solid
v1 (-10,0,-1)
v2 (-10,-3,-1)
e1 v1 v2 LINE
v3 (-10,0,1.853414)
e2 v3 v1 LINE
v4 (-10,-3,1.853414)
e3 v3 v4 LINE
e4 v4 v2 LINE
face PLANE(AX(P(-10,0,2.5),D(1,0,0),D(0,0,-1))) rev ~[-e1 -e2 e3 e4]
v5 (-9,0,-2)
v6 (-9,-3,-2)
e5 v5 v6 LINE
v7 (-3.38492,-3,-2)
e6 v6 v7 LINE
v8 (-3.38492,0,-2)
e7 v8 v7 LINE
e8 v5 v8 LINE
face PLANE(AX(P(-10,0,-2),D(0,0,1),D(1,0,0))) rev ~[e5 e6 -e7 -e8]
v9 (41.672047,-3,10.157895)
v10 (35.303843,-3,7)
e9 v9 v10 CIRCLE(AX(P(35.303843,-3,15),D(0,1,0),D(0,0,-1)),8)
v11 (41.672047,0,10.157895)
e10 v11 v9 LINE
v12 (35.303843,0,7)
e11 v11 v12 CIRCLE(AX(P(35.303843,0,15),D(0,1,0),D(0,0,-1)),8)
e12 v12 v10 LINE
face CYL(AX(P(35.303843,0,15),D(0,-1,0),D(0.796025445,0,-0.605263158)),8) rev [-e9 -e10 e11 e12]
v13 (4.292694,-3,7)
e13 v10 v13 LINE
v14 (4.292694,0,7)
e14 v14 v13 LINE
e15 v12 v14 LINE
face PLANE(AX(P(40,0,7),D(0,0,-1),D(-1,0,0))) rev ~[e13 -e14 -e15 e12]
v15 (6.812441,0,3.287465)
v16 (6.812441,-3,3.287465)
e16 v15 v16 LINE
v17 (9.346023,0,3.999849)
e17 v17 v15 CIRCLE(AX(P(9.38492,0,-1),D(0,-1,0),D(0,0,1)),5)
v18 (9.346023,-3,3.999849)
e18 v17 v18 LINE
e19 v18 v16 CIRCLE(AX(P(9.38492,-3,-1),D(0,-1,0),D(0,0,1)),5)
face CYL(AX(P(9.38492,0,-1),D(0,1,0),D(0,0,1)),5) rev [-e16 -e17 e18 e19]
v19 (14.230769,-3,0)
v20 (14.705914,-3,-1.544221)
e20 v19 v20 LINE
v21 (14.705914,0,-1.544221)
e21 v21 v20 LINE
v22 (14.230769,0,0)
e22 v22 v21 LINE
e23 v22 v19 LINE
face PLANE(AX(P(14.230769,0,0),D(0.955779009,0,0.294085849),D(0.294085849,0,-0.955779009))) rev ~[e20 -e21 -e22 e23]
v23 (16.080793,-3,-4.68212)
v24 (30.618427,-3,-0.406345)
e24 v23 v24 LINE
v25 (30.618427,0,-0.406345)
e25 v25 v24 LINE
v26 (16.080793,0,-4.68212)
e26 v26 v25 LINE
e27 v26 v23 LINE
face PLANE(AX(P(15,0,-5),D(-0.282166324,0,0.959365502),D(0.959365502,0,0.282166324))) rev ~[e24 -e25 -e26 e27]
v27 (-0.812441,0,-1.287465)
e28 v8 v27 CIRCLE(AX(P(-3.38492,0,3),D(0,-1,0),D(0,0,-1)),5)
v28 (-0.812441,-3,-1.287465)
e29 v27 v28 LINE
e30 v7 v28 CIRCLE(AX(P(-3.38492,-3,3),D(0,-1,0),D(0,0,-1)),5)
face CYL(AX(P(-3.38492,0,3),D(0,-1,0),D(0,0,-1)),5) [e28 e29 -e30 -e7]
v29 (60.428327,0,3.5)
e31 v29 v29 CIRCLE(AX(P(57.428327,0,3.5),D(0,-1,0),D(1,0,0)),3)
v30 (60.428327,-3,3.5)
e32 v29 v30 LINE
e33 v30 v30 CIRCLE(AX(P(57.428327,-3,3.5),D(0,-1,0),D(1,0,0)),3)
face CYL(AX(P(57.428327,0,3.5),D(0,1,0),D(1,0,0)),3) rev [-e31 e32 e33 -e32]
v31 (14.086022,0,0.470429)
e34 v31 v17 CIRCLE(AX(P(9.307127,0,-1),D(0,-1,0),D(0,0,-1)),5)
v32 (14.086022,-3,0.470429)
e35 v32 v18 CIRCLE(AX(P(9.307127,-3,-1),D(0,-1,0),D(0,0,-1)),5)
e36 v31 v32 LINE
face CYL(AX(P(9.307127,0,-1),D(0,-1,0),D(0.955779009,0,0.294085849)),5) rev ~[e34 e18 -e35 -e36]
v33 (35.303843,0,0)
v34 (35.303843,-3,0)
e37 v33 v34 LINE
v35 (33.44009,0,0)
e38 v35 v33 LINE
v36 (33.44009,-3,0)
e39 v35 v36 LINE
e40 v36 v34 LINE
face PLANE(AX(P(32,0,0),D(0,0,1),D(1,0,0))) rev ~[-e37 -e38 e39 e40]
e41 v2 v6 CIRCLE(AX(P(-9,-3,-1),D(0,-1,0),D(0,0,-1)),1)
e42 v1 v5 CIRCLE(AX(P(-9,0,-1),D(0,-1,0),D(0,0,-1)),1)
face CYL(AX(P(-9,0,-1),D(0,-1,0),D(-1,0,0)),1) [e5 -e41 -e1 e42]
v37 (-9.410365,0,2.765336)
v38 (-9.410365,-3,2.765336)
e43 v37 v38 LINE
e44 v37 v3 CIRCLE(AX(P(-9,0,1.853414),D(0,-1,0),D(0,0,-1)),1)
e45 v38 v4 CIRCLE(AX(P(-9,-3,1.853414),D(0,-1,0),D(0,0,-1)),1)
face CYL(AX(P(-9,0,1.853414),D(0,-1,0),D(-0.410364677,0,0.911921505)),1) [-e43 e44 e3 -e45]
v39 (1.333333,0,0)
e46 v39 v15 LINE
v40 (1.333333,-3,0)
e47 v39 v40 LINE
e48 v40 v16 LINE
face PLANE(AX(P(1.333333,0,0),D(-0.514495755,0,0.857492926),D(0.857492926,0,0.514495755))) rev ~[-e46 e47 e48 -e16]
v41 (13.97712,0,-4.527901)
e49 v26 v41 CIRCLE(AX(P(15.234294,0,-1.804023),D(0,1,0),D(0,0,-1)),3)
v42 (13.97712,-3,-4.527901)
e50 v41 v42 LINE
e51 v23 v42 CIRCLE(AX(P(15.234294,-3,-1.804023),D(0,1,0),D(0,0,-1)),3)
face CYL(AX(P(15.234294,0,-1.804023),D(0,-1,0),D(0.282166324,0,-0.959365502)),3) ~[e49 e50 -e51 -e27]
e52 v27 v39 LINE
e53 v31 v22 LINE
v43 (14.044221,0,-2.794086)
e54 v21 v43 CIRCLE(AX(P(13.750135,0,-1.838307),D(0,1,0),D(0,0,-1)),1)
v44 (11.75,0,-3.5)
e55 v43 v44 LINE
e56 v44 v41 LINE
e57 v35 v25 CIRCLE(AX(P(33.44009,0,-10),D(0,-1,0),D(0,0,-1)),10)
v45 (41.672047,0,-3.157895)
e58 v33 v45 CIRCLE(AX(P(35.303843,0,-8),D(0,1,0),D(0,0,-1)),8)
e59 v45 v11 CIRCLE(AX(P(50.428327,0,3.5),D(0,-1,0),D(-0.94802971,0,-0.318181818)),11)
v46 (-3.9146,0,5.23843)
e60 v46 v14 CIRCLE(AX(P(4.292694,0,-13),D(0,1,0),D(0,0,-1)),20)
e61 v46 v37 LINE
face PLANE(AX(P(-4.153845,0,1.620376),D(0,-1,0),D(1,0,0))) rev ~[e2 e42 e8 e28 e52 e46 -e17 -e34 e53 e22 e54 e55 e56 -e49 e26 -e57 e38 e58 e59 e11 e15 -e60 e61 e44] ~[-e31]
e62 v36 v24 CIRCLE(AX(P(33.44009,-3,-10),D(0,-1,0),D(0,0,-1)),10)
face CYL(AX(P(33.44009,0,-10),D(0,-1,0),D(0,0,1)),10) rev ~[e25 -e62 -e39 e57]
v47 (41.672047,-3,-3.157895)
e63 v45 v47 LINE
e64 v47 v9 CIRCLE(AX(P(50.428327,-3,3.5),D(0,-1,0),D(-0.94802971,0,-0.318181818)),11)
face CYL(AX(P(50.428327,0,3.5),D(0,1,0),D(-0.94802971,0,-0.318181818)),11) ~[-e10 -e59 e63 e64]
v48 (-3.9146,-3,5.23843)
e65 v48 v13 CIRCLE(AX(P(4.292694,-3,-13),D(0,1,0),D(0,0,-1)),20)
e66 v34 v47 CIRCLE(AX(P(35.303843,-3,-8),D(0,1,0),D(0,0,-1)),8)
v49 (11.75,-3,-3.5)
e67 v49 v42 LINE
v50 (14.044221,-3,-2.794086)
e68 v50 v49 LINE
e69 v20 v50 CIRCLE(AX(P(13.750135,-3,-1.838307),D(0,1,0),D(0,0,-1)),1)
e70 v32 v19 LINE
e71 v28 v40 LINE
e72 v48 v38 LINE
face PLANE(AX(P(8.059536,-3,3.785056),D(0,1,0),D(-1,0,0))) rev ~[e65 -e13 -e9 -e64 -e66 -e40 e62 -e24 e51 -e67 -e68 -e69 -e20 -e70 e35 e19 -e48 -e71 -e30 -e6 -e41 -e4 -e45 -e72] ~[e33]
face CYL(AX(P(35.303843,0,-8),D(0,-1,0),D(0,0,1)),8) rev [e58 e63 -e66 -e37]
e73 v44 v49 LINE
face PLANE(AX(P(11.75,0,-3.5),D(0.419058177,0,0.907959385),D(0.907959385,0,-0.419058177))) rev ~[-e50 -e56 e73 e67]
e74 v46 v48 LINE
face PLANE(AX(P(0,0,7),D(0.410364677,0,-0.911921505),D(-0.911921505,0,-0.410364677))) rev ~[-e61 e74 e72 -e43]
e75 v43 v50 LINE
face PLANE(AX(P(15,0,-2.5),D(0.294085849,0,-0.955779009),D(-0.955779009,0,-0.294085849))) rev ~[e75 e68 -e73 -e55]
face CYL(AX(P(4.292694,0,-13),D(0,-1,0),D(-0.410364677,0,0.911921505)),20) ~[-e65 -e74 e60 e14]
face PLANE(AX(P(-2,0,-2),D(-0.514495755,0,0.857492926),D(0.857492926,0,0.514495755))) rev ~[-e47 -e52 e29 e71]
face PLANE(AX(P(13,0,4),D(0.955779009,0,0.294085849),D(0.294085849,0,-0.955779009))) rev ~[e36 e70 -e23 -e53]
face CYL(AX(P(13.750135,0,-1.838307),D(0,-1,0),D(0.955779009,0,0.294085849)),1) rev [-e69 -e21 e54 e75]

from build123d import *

# Parameters (mm, degrees)
F0_R        = 3
F1_DEPTH    = 3
F2_R        = 10
F3_R        = 5
F4_R        = 1
F5_T1_DEPTH = 3
F6_R        = 20
F7_R        = 1
F8_R        = 3
F9_R        = 8


# Not quite as in the source:
# - a fillet or chamfer that OpenCascade refuses, or shapes differently, is made with other operations: its cross-section is extruded or revolved along the edge and cut away or added
# - a feature names something its author has since deleted; it is built from what else it names


with BuildPart() as f1:
    # F0 (on Front) → F1 (new body)
    with BuildSketch(Plane.XZ):
        Polygon((-2, -2), (1.3333333333, 0), (0, 0), (0, 7), (-10, 2.5), (-10, -2), align=None)
        Polygon((14.2307692308, 0), (32, 0), (40, 0), (40, 7), (0, 7), (0, 0), (1.3333333333, 0), (8, 4), (13, 4), align=None)
        Polygon((15, -5), (32, 0), (14.2307692308, 0), (15, -2.5), (11.75, -3.5), align=None)
        with BuildLine():
            Line((40, 7), (40, 0))
            ThreePointArc((40, 0), (61.4283268073, 3.5), (40, 7))
        make_face()
        with Locations((57.4283268073, 3.5)):
            Circle(F0_R, mode=Mode.SUBTRACT)
    extrude(amount=F1_DEPTH)

    # F2
    f2_edges = [f1.edges().sort_by_distance(p)[0] for p in [
        (32, -1.5, 0),
    ]]
    fillet(f2_edges, radius=F2_R)

    # F3
    f3_edges = [f1.edges().sort_by_distance(p)[0] for p in [
        (13, -1.5, 4),
        (-2, -1.5, -2),
    ]]
    fillet(f3_edges, radius=F3_R)

    # F4
    f4_edges = [f1.edges().sort_by_distance(p)[0] for p in [
        (15, -1.5, -2.5),
    ]]
    fillet(f4_edges, radius=F4_R)

    # F5: fillet of radius 5 on 1 edges, made by hand

    # F5_s2 → F5_t1 (join)
    with BuildSketch(Plane.XZ):
        with BuildLine():
            ThreePointArc((9.3849198247, 4), (8.0502519153, 3.8185746411), (6.8124410476, 3.2874646286))
            Line((6.8124410476, 3.2874646286), (8, 4))
            Line((8, 4), (9.3849198247, 4))
        make_face()
    extrude(amount=F5_T1_DEPTH)

    # F6
    f6_edges = [f1.edges().sort_by_distance(p)[0] for p in [
        (0, -1.5, 7),
    ]]
    fillet(f6_edges, radius=F6_R)

    # F7
    f7_edges = [f1.edges().sort_by_distance(p)[0] for p in [
        (-10, -1.5, 2.5),
        (-10, -1.5, -2),
    ]]
    fillet(f7_edges, radius=F7_R)

    # F8
    f8_edges = [f1.edges().sort_by_distance(p)[0] for p in [
        (15, -1.5, -5),
    ]]
    fillet(f8_edges, radius=F8_R)

    # F9
    f9_edges = [f1.edges().sort_by_distance(p)[0] for p in [
        (40, -1.5, 7),
        (40, -1.5, 0),
    ]]
    fillet(f9_edges, radius=F9_R)


solid = f1.part
